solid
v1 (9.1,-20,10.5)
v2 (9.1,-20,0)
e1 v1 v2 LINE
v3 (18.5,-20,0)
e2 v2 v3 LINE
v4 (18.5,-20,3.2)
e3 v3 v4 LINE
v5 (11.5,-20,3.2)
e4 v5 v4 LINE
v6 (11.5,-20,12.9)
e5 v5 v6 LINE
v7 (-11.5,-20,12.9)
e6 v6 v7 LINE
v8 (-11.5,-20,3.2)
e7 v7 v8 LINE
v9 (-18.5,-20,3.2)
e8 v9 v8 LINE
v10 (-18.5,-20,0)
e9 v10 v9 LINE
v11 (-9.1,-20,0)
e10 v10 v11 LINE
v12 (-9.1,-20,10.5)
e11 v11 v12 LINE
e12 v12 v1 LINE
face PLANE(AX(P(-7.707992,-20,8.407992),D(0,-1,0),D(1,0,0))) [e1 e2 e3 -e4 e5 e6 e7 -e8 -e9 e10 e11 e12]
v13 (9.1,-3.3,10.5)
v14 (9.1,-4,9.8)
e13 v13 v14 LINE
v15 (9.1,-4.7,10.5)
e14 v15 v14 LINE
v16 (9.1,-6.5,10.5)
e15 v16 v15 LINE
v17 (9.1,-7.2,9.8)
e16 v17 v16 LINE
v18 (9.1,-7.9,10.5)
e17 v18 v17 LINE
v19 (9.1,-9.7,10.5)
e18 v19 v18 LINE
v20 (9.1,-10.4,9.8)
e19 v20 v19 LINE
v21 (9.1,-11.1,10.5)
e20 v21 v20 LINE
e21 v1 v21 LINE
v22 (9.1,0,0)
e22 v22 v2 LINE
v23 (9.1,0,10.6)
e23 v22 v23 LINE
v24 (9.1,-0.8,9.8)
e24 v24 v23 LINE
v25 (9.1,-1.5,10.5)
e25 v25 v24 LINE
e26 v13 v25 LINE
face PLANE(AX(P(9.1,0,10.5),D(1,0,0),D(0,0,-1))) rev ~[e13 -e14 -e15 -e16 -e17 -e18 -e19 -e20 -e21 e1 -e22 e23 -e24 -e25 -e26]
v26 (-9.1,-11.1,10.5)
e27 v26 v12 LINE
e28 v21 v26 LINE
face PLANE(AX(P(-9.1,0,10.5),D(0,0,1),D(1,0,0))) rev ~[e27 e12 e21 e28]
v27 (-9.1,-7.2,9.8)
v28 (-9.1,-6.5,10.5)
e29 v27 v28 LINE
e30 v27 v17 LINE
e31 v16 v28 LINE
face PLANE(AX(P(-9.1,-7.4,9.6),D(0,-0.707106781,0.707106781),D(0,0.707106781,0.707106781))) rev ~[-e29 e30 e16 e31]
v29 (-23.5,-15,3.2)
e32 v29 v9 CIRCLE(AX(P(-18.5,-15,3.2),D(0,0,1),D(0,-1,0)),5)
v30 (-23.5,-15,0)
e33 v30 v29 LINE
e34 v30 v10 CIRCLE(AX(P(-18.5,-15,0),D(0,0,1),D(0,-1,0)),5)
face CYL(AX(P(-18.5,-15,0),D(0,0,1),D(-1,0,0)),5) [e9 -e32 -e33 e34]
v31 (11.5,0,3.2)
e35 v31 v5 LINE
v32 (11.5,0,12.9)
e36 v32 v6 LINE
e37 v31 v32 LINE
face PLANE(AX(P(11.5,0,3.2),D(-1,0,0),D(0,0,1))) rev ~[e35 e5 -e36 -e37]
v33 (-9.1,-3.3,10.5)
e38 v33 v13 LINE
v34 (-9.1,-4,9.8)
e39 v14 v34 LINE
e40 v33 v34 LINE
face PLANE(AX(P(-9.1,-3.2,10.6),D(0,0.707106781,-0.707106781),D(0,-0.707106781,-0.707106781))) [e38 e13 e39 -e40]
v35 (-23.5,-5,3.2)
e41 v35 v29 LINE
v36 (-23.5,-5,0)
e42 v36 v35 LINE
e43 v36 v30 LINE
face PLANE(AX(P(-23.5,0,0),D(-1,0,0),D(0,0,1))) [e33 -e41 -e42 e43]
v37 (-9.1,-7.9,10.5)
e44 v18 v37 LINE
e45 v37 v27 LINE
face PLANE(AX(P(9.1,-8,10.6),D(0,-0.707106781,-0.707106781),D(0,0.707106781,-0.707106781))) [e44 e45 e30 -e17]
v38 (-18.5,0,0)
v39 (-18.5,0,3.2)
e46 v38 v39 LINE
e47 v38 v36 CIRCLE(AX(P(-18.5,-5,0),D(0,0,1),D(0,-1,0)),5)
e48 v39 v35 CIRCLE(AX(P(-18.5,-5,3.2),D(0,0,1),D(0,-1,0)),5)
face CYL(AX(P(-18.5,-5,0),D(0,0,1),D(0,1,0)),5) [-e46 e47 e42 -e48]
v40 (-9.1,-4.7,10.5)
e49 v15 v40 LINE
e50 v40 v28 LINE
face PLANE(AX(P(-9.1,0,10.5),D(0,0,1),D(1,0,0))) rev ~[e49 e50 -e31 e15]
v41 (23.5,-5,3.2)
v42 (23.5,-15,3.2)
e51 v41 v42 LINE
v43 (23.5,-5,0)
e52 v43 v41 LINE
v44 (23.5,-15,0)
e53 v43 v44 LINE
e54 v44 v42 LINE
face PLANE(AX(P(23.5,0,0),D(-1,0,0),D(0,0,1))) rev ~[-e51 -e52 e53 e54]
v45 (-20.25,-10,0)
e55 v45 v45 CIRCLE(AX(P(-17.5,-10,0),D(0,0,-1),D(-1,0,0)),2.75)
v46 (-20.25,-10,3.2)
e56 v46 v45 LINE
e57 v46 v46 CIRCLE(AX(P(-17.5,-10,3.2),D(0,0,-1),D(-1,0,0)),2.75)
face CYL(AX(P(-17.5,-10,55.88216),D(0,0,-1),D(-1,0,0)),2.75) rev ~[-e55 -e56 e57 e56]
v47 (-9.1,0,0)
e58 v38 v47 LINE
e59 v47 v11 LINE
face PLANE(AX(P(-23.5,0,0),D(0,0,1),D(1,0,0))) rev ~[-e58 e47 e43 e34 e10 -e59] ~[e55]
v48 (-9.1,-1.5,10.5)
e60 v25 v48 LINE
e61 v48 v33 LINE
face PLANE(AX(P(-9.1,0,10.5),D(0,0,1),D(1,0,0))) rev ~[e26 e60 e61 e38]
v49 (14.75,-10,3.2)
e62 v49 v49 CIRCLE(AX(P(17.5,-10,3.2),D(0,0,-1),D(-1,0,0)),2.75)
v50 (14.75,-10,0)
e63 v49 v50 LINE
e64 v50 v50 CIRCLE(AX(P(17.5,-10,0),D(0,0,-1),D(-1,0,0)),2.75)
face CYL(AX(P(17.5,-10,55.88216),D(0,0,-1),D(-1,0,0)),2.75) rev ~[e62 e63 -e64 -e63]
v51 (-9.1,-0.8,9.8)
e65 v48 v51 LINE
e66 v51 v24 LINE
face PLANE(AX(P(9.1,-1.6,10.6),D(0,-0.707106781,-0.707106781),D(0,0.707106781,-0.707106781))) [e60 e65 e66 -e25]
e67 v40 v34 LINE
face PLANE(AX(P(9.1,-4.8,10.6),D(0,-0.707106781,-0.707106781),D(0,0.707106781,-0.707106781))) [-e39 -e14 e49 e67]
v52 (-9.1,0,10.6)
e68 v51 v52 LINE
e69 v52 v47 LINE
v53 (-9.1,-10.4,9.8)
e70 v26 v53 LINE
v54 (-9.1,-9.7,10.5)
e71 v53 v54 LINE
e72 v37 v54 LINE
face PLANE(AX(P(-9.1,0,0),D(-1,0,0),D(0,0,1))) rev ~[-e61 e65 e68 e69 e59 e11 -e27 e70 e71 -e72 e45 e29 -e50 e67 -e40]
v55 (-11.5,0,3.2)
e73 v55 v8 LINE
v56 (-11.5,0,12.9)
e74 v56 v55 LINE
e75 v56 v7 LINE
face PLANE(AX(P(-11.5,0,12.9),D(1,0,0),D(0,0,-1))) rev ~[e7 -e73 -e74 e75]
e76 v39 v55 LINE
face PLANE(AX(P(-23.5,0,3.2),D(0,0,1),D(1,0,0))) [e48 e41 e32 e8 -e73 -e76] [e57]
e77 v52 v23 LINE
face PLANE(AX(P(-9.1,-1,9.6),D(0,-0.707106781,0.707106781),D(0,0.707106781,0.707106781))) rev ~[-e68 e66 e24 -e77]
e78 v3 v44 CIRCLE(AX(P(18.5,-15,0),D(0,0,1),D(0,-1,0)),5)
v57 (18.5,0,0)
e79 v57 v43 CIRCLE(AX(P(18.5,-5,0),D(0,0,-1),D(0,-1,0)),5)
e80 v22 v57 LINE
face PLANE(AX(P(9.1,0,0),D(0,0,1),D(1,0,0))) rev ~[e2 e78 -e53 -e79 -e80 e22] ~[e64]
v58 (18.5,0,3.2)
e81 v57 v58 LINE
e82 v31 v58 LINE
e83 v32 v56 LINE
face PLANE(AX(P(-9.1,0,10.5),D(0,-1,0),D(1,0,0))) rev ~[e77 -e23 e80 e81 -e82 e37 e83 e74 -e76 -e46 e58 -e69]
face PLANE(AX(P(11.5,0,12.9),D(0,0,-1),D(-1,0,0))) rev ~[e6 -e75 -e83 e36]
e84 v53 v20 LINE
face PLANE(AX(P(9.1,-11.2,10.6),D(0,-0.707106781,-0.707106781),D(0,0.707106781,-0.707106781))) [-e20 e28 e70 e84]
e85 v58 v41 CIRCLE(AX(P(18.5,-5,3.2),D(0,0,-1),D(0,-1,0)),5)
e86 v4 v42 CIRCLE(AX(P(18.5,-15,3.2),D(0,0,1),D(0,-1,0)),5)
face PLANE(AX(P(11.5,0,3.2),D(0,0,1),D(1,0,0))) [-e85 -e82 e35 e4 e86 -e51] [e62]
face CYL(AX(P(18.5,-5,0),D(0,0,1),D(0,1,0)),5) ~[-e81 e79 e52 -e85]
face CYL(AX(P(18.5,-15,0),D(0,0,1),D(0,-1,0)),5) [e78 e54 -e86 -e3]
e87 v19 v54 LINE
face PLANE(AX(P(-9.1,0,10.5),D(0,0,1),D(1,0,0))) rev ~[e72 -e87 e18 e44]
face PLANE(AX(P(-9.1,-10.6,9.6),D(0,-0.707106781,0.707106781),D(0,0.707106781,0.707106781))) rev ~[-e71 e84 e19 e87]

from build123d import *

# Parameters (mm, degrees)
F0_W         = 12
F0_H         = 3.2
F1_DEPTH     = 20
F3_D         = 5.5
F4_W         = 18.2
F4_H         = 1.6
F5_DEPTH     = 0.9
F6_T1_DEPTH  = 18.2
F6_T6_DEPTH  = 18.2
F6_T11_DEPTH = 18.2
F6_T16_DEPTH = 18.2
F6_T21_DEPTH = 18.2
F6_T26_DEPTH = 18.2
F6_T31_DEPTH = 18.2
F6_T36_DEPTH = 18.2
F7_R         = 5


# Not quite as in the source:
# - a fillet or chamfer that OpenCascade refuses, or shapes differently, is made with other operations: its cross-section is extruded or revolved along the edge and cut away or added


with BuildPart() as f1:
    # F0 (on Front) → F1 (new body)
    with BuildSketch(Plane.XZ):
        Polygon((-9.1, 10.5), (0, 10.5), (0, 12.9), (-11.5, 12.9), (-11.5, 3.2), (-11.5, 0), (-9.1, 0), align=None)
        with Locations((-17.5, 1.6)):
            Rectangle(F0_W, F0_H)
        Polygon((0, 12.9), (0, 10.5), (9.1, 10.5), (9.1, 0), (11.5, 0), (11.5, 3.2), (11.5, 12.9), align=None)
        with Locations((17.5, 1.6)):
            Rectangle(F0_W, F0_H)
    extrude(amount=F1_DEPTH)

    # F3 (through all)
    with Locations(Plane.XY.offset(3.2)):
        with Locations((-17.5, -10), (17.5, -10)):
            Hole(F3_D / 2)

    # F4 (on face) → F5 (join)
    with BuildSketch(Plane(origin=(0, 0, 10.5), x_dir=(1, 0, 0), z_dir=(0, 0, -1))):
        with Locations((0, 0.8)):
            Rectangle(F4_W, F4_H)
        with Locations((0, 4)):
            Rectangle(F4_W, F4_H)
        with Locations((0, 7.2)):
            Rectangle(F4_W, F4_H)
        with Locations((0, 10.4)):
            Rectangle(F4_W, F4_H)
    extrude(amount=F5_DEPTH)

    # F6: chamfer of 1 on 8 edges, made by hand

    # F6_s2 → F6_t1 (cut)
    with BuildSketch(Plane.YZ.offset(-9.1)):
        Polygon((-1, 9.6), (0, 10.6), (0, 9.6), align=None)
    extrude(amount=F6_T1_DEPTH, mode=Mode.SUBTRACT)


with BuildPart() as f6_tool4:
    # F6_s5 → F6_t6 (new body)
    with BuildSketch(Plane.YZ.offset(9.1)):
        Polygon((-1.6, 10.6), (-0.6, 9.6), (-1.6, 9.6), align=None)
    extrude(amount=-F6_T6_DEPTH)

    split(bisect_by=Plane.XY.offset(10.5), keep=Keep.BOTTOM)


with BuildPart() as f1_1:
    add(f1.part)

    # F6_t3: cut F6_tool4
    add(f6_tool4.part, mode=Mode.SUBTRACT)


with BuildPart() as f6_tool9:
    # F6_s10 → F6_t11 (new body)
    with BuildSketch(Plane.YZ.offset(-9.1)):
        Polygon((-3.2, 10.6), (-4.2, 9.6), (-3.2, 9.6), align=None)
    extrude(amount=F6_T11_DEPTH)

    split(bisect_by=Plane.XY.offset(10.5), keep=Keep.BOTTOM)


with BuildPart() as f1_2:
    add(f1_1.part)

    # F6_t8: cut F6_tool9
    add(f6_tool9.part, mode=Mode.SUBTRACT)


with BuildPart() as f6_tool14:
    # F6_s15 → F6_t16 (new body)
    with BuildSketch(Plane.YZ.offset(9.1)):
        Polygon((-4.8, 10.6), (-3.8, 9.6), (-4.8, 9.6), align=None)
    extrude(amount=-F6_T16_DEPTH)

    split(bisect_by=Plane.XY.offset(10.5), keep=Keep.BOTTOM)


with BuildPart() as f1_3:
    add(f1_2.part)

    # F6_t13: cut F6_tool14
    add(f6_tool14.part, mode=Mode.SUBTRACT)


with BuildPart() as f6_tool19:
    # F6_s20 → F6_t21 (new body)
    with BuildSketch(Plane.YZ.offset(-9.1)):
        Polygon((-7.4, 9.6), (-6.4, 10.6), (-6.4, 9.6), align=None)
    extrude(amount=F6_T21_DEPTH)

    split(bisect_by=Plane.XY.offset(10.5), keep=Keep.BOTTOM)


with BuildPart() as f1_4:
    add(f1_3.part)

    # F6_t18: cut F6_tool19
    add(f6_tool19.part, mode=Mode.SUBTRACT)


with BuildPart() as f6_tool24:
    # F6_s25 → F6_t26 (new body)
    with BuildSketch(Plane.YZ.offset(9.1)):
        Polygon((-8, 10.6), (-7, 9.6), (-8, 9.6), align=None)
    extrude(amount=-F6_T26_DEPTH)

    split(bisect_by=Plane.XY.offset(10.5), keep=Keep.BOTTOM)


with BuildPart() as f1_5:
    add(f1_4.part)

    # F6_t23: cut F6_tool24
    add(f6_tool24.part, mode=Mode.SUBTRACT)


with BuildPart() as f6_tool29:
    # F6_s30 → F6_t31 (new body)
    with BuildSketch(Plane.YZ.offset(-9.1)):
        Polygon((-10.6, 9.6), (-9.6, 10.6), (-9.6, 9.6), align=None)
    extrude(amount=F6_T31_DEPTH)

    split(bisect_by=Plane.XY.offset(10.5), keep=Keep.BOTTOM)


with BuildPart() as f1_6:
    add(f1_5.part)

    # F6_t28: cut F6_tool29
    add(f6_tool29.part, mode=Mode.SUBTRACT)


with BuildPart() as f6_tool34:
    # F6_s35 → F6_t36 (new body)
    with BuildSketch(Plane.YZ.offset(9.1)):
        Polygon((-11.2, 10.6), (-10.2, 9.6), (-11.2, 9.6), align=None)
    extrude(amount=-F6_T36_DEPTH)

    split(bisect_by=Plane.XY.offset(10.5), keep=Keep.BOTTOM)


with BuildPart() as f1_7:
    add(f1_6.part)

    # F6_t33: cut F6_tool34
    add(f6_tool34.part, mode=Mode.SUBTRACT)

    # F7
    f7_edges = [f1_7.edges().sort_by_distance(p)[0] for p in [
        (-23.5, -20, 1.6),
        (23.5, -20, 1.6),
        (23.5, 0, 1.6),
        (-23.5, 0, 1.6),
    ]]
    fillet(f7_edges, radius=F7_R)


solid = f1_7.part
